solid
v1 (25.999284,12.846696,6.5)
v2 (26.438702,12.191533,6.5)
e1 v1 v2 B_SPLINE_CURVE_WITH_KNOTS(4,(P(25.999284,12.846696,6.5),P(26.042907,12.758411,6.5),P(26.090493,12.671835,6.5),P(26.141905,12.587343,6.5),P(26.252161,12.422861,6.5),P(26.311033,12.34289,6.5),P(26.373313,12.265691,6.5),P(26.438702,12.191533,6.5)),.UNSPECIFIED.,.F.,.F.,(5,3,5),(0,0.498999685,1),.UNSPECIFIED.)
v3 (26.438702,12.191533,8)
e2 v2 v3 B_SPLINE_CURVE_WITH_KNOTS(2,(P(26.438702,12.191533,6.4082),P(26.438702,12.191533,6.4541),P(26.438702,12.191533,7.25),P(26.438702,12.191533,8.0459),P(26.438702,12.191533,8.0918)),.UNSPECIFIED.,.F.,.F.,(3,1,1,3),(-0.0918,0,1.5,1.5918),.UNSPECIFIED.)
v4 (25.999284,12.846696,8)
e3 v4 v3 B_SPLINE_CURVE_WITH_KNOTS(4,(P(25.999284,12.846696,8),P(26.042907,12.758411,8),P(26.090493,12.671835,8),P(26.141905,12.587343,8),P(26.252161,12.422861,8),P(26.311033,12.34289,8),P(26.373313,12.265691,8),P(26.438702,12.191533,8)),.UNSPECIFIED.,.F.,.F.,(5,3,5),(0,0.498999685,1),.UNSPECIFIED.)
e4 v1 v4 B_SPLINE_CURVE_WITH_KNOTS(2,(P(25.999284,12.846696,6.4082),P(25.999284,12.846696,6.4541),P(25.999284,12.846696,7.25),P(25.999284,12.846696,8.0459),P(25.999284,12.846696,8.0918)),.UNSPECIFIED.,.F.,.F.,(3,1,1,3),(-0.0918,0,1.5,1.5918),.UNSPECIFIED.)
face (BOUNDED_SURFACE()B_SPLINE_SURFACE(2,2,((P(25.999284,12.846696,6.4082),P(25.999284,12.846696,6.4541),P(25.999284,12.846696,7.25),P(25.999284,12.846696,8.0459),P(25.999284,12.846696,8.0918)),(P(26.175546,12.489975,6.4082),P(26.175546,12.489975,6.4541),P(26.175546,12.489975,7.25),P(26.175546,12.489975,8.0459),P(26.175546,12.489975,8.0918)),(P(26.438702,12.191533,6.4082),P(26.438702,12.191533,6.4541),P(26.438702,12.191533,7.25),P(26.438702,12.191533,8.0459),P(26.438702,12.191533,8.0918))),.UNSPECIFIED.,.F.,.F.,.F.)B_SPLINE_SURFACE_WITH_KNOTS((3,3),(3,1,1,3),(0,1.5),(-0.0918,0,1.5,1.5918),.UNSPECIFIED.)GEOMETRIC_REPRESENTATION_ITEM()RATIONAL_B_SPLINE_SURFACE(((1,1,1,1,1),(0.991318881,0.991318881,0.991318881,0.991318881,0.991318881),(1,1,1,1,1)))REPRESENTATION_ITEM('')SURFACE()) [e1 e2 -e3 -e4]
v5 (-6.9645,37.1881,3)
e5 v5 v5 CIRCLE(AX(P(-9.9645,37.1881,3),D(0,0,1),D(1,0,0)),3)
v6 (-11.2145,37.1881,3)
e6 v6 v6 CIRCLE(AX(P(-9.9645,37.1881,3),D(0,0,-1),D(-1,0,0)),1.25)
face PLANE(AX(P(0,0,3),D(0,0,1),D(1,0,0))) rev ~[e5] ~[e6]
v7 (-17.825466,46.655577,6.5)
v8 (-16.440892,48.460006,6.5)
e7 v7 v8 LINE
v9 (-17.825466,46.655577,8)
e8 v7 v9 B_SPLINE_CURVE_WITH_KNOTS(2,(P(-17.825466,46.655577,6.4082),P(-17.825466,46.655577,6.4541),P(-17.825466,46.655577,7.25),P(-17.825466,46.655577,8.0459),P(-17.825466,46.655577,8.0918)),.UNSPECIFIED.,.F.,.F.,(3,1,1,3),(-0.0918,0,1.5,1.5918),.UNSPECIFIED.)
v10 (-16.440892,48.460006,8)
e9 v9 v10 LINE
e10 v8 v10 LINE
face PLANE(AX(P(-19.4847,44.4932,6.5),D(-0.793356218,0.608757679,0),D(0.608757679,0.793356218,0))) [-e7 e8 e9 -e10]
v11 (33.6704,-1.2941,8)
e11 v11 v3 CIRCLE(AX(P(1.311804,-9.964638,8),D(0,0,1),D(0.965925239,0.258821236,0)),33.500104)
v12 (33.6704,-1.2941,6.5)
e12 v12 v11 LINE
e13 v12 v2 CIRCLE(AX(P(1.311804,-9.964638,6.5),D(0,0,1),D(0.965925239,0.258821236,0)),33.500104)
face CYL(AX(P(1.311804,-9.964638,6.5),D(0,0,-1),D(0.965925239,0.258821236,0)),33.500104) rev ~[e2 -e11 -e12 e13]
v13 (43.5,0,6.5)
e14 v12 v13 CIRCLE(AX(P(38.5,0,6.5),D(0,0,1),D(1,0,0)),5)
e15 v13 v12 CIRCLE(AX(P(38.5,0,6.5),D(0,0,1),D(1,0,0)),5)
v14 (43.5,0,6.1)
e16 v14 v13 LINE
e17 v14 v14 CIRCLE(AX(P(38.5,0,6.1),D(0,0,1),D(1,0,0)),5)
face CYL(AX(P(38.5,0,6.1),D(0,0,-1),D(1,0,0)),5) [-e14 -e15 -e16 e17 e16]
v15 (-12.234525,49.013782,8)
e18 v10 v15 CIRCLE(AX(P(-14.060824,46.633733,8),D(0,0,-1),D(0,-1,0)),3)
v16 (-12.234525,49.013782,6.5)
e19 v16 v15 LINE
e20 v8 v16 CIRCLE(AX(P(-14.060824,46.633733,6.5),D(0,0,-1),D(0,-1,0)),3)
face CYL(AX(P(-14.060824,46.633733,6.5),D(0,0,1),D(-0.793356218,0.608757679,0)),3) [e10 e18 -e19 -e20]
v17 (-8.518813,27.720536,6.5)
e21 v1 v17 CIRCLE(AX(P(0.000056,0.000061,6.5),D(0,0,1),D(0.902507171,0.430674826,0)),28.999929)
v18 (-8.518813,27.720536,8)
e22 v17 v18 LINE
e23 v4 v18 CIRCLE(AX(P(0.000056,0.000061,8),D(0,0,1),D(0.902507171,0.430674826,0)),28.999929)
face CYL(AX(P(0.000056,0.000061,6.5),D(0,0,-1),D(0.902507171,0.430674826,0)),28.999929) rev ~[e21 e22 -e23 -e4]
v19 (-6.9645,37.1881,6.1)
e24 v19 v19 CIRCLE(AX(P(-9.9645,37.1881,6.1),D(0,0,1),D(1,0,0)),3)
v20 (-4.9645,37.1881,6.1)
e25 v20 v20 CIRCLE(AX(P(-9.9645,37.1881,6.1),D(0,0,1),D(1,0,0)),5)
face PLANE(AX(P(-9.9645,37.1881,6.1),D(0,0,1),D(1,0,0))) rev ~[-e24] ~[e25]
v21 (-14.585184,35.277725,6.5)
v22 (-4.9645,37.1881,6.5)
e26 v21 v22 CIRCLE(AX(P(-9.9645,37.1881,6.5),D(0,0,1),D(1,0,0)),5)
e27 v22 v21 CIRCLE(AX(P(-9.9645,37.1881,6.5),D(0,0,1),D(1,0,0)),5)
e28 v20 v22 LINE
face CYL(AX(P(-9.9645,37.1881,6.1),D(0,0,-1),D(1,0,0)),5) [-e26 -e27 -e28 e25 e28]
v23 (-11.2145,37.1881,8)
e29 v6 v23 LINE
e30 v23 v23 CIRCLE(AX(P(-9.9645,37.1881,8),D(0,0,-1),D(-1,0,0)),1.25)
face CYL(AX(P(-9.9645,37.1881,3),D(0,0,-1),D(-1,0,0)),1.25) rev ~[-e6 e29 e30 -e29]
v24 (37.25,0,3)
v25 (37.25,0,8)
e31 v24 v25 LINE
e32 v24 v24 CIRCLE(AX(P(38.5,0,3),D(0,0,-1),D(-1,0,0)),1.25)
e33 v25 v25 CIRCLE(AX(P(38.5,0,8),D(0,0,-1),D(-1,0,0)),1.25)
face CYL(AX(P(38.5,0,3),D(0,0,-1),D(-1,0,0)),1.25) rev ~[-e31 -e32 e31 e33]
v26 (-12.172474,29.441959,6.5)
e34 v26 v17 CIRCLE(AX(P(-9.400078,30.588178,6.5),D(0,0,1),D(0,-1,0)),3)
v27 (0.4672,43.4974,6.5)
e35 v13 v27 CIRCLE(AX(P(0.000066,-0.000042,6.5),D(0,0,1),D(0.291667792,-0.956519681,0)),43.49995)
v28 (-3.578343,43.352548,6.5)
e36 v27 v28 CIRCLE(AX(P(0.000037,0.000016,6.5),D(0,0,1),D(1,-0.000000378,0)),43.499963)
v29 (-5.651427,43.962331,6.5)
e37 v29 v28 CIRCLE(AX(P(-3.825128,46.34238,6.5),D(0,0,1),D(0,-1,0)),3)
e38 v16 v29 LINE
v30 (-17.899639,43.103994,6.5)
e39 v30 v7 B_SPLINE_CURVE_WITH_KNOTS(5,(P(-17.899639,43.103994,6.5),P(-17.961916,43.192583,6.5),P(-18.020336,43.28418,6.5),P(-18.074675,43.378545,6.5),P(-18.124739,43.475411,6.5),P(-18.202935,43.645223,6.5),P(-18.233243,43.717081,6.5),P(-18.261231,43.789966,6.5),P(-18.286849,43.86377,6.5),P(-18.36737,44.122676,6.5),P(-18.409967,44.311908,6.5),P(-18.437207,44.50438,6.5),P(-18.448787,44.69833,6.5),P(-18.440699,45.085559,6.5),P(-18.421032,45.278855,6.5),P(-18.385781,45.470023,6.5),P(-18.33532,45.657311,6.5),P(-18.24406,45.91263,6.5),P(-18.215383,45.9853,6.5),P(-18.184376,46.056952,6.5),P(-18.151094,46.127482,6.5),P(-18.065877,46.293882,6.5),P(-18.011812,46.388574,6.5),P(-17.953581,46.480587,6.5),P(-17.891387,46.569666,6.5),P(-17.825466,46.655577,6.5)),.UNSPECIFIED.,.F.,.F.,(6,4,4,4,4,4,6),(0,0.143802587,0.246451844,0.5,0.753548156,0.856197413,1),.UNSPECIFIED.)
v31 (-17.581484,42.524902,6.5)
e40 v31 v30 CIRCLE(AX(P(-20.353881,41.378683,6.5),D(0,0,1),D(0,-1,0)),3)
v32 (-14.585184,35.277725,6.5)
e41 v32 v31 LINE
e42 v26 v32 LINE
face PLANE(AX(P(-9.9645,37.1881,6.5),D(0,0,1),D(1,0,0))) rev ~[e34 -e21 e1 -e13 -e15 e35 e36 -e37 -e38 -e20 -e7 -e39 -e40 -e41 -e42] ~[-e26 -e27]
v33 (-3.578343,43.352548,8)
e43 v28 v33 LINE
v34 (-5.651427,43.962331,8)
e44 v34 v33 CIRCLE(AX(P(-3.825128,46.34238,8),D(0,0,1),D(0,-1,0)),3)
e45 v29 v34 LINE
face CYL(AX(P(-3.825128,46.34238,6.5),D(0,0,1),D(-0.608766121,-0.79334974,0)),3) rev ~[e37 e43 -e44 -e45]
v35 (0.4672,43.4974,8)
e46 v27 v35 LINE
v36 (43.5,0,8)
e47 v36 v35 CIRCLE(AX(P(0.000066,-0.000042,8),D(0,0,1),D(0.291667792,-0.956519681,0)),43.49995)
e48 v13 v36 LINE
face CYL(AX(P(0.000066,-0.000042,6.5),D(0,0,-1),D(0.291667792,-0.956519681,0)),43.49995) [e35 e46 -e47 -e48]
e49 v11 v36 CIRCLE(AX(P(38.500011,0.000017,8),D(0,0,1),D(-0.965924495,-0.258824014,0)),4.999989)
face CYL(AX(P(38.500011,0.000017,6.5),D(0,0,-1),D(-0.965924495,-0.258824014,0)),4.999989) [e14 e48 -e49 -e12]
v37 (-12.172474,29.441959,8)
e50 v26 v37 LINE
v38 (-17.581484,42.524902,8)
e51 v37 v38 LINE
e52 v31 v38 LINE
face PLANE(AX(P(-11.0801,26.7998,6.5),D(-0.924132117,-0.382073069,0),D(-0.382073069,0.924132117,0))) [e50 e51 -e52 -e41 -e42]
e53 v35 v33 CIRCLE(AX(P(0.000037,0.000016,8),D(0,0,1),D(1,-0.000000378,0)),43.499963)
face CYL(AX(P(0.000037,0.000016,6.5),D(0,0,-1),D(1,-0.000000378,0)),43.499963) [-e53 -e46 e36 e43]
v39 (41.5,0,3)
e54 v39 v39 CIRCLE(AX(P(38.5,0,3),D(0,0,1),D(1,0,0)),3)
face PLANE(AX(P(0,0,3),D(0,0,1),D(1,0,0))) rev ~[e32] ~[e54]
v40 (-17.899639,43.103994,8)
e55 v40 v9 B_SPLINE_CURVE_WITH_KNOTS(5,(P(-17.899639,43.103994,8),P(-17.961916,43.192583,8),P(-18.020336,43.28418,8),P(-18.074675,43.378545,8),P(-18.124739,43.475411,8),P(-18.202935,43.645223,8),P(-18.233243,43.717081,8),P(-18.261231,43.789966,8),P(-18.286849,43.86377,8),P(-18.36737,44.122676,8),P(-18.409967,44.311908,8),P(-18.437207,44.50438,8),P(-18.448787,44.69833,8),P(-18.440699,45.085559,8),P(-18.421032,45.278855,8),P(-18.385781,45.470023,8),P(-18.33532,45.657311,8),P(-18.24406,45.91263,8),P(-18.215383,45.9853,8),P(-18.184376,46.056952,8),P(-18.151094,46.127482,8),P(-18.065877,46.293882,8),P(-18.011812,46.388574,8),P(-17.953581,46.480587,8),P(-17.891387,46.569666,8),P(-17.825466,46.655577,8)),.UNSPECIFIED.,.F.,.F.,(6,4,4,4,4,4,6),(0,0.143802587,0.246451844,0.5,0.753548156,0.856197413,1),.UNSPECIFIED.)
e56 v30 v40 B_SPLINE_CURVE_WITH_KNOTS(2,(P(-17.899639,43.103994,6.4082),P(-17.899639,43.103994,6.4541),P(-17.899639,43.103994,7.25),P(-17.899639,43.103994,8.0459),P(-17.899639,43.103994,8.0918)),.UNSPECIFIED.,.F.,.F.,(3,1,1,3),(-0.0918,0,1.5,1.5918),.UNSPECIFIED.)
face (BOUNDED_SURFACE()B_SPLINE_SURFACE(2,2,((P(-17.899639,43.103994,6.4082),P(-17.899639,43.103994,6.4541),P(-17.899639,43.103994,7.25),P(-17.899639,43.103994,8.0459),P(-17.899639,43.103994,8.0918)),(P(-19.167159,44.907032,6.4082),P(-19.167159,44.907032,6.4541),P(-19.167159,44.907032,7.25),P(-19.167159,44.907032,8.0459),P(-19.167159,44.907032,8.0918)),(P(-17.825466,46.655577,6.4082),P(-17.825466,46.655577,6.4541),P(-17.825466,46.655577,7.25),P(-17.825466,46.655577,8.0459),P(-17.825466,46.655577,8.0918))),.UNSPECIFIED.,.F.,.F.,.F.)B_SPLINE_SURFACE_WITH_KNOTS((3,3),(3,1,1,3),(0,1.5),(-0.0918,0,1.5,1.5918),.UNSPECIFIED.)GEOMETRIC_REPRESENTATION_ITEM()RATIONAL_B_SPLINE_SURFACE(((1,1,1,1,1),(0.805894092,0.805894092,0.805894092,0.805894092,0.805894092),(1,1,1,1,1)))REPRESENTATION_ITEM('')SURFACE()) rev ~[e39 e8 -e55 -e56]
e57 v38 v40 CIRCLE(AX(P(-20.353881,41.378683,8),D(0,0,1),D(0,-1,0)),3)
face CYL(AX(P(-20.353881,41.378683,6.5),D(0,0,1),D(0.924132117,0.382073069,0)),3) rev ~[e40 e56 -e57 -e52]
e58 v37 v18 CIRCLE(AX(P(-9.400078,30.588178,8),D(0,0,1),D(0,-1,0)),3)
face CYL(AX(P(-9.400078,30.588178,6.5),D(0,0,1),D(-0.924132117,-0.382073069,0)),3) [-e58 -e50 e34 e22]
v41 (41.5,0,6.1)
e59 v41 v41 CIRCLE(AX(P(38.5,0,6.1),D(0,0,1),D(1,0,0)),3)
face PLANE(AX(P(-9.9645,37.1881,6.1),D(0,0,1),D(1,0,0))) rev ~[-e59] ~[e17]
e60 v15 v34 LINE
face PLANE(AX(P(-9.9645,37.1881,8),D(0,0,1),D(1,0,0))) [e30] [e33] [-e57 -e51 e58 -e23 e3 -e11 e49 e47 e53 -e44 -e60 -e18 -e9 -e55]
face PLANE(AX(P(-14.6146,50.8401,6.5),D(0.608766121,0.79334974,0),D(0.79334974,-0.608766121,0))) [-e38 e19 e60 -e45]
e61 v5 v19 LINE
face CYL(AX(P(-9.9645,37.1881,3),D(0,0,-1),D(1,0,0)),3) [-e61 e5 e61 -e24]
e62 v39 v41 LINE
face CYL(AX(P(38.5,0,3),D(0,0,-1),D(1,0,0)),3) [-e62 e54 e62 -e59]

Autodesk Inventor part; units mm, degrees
ref_plane "YZ Plane" through (0, 0, 0) normal (1, 0, 0) x (0, 1, 0)
ref_plane "XZ Plane" through (0, 0, 0) normal (0, 1, 0) x (-1, 0, 0)
ref_plane "XY Plane" through (0, 0, 0) normal (0, 0, 1) x (1, 0, 0)
sketch "スケッチ1" plane through (0, 0, 0) normal (0, 0, 1) x (1, 0, 0)
  circle A0 centre (0, 0) radius 33.5 construction
  circle A1 centre (0, 0) radius 43.5
  dimension "d0" = 67
  dimension "d1" = 87
extrude "押し出し1" add sketch "スケッチ1" along normal blind 1
sketch "スケッチ2" plane through (0, 0, 1) normal (0, 0, 1) x (1, 0, 0)
  circle A0 centre (0, 0) radius 33.5
  circle A1 centre (0, 0) radius 43.5 projected
  dimension "d4" = 67
extrude "押し出し2" add sketch "スケッチ2" along normal blind 2
sketch "スケッチ4" plane through (0, 0, 3) normal (0, 0, 1) x (1, 0, 0)
  circle A0 centre (0, 0) radius 33.5 construction
  circle A1 centre (0, 0) radius 43.5 construction
  line L0 (0, 0) -> (33.5, 0) construction
  line L1 (33.5, 0) -> (43.5, 0) construction
  circle A2 centre (0, 0) radius 33.5 construction
  line L2 (0, 0) -> (-33.5, 0) construction
  circle A3 centre (0, 0) radius 43.5 construction
  line L3 (-43.5, 0) -> (-33.5, 0) construction
  circle A4 centre (38.5, 0) radius 3.05
  circle A5 centre (-38.5, 0) radius 3.05
  circle A6 centre (0, 0) radius 38.5 construction
  circle A7 centre (-9.9645, 37.1881) radius 3.05 construction
  arc A8 (-3.4944, 44.3648) -> (-9.9645, 37.1881) centre (38.5, 0) ccw construction
  line L4 (38.5, 0) -> (-9.9645, 37.1881) construction
  line L5 (-9.9645, 37.1881) -> (-12.3843, 39.0449) construction
  arc A9 (0.0788, 43.4999) -> (-7.5448, 35.3314) centre (38.5, 0) ccw
  arc A10 (-9.6001, 42.4274) -> (-12.3843, 39.0449) centre (38.5, 0) ccw
  arc A11 (-12.3843, 39.0449) -> (-7.5448, 35.3314) centre (-9.9645, 37.1881) ccw
  arc A12 (0.0788, 43.4999) -> (-9.6001, 42.4274) centre (0, 0) ccw
  circle A13 centre (9.9645, -37.1881) radius 3.05 construction
  line L6 (-38.5, 0) -> (9.9645, -37.1881) construction
  line L7 (9.9645, -37.1881) -> (12.3843, -39.0449) construction
  arc A14 (-0.0788, -43.4999) -> (7.5448, -35.3314) centre (-38.5, 0) ccw
  arc A15 (9.6001, -42.4274) -> (12.3843, -39.0449) centre (-38.5, 0) ccw
  arc A16 (12.3843, -39.0449) -> (7.5448, -35.3314) centre (9.9645, -37.1881) ccw
  arc A17 (-0.0788, -43.4999) -> (9.6001, -42.4274) centre (0, 0) ccw
  line L8 (-9.9645, 37.1881) -> (9.9645, -37.1881) construction
  dimension "d7" = 6.1
  dimension "d8" = 3.05
  dimension "d15" = 105
extrude "押し出し3" cut sketch "スケッチ4" against normal through all
fillet "フィレット1" radius 1 4 edges at (-9.6001, 42.4274, 1.5) (0.0788, 43.4999, 1.5) (-0.0788, -43.4999, 1.5) (9.6001, -42.4274, 1.5)
sketch "スケッチ6" plane through (0, 0, 3) normal (0, 0, 1) x (1, 0, 0)
  arc A0 (-12.3843, 39.0449) -> (-7.5448, 35.3314) centre (-9.9645, 37.1881) ccw construction
  circle A1 centre (38.5, 0) radius 3.05 construction
  circle A2 centre (-9.9645, 37.1881) radius 3
  circle A3 centre (38.5, 0) radius 3
  point P0 (0, 0)
  dimension "d16" = 6
extrude "押し出し5" add sketch "スケッチ6" along normal blind 3.1
sketch "スケッチ7" plane through (-9.9645, 37.1881, 6.1) normal (0, 0, 1) x (1, 0, 0)
  circle A0 centre (0, 0) radius 3 construction
  circle A1 centre (48.4645, -37.1881) radius 3 construction
  circle A2 centre (0, 0) radius 5
  circle A3 centre (48.4645, -37.1881) radius 3 projected
  circle A4 centre (48.4645, -37.1881) radius 5
  point P0 (9.9645, -37.1881)
  dimension "d19" = 10
extrude "押し出し6" add sketch "スケッチ7" along normal blind 0.4 contours A2 | A3 | A4
sketch "スケッチ8" plane through (-9.9645, 37.1881, 6.5) normal (0, 0, 1) x (1, 0, 0)
  circle A0 centre (9.9645, -37.1881) radius 33.5 construction
  circle A1 centre (9.9645, -37.1881) radius 29 construction
  circle A2 centre (48.4645, -37.1881) radius 5 construction
  arc A3 (43.6349, -38.4822) -> (36.1372, -24.6985) centre (11.2764, -47.1527) ccw construction
  line L0 (9.9645, -37.1881) -> (48.4645, -37.1881) construction
  line L1 (48.4645, -37.1881) -> (11.2764, -47.1527) construction
  circle A4 centre (0, 0) radius 5 construction
  circle A5 centre (48.4645, -37.1881) radius 3.05 construction
  line L2 (48.4645, -37.1881) -> (-9.5202, 7.3051) construction
  line L3 (9.9645, -37.1881) -> (-4.6207, -1.9104) construction
  circle A6 centre (0, 0) radius 5 construction
  line L4 (-1.1156, -10.3883) -> (-7.9245, 6.0806)
  arc A7 (36.1372, -24.6985) -> (-1.1156, -10.3883) centre (9.9645, -37.1881) ccw
  arc A8 (43.6349, -38.4822) -> (36.1372, -24.6985) centre (11.2764, -47.1527) ccw
  arc A9 (22.6521, -78.7967) -> (10.4317, 6.3093) centre (9.9645, -37.1881) ccw projected
  arc A10 (43.6349, -38.4822) -> (53.4645, -37.1881) centre (48.4645, -37.1881) ccw
  arc A11 (53.4645, -37.1881) -> (5.2496, 6.0556) centre (9.9645, -37.1881) ccw
  line L5 (-7.9245, 6.0806) -> (-9.5202, 7.3051)
  line L6 (-9.5202, 7.3051) -> (-4.6501, 13.652)
  line L7 (-4.6501, 13.652) -> (5.2496, 6.0556)
  point P0 (10.4317, 6.3093)
  dimension "d22" = 58
  dimension "d23" = 15
  dimension "d24" = 12
  dimension "d25" = 8
extrude "押し出し7" add sketch "スケッチ8" along normal blind 1.5
sketch "スケッチ9" plane through (0, 0, 3) normal (0, 0, 1) x (1, 0, 0)
  circle A0 centre (0, 0) radius 61.8319
extrude "押し出し8" cut sketch "スケッチ9" against normal through all
sketch "スケッチ10" plane through (-9.9645, 37.1881, 3) normal (0, 0, -1) x (-1, 0, 0)
  circle A0 centre (-48.4645, -37.1881) radius 3 construction
  circle A1 centre (0, 0) radius 3 construction
  circle A2 centre (-48.4645, -37.1881) radius 1.25
  circle A3 centre (0, 0) radius 1.25
  point P0 (-9.9645, -37.1881)
  dimension "d30" = 2.5
extrude "押し出し9" cut sketch "スケッチ10" against normal through all
fillet "フィレット2" radius 3 6 edges at (-19.4848, 44.4933, 7.25) (-14.6147, 50.8401, 7.25) (-17.889, 43.2688, 7.25) (-4.7149, 43.2437, 7.25) (-11.0801, 26.7998, 7.25) (26.1727, 12.4896, 7.25)
properties part number "kanure_02"
